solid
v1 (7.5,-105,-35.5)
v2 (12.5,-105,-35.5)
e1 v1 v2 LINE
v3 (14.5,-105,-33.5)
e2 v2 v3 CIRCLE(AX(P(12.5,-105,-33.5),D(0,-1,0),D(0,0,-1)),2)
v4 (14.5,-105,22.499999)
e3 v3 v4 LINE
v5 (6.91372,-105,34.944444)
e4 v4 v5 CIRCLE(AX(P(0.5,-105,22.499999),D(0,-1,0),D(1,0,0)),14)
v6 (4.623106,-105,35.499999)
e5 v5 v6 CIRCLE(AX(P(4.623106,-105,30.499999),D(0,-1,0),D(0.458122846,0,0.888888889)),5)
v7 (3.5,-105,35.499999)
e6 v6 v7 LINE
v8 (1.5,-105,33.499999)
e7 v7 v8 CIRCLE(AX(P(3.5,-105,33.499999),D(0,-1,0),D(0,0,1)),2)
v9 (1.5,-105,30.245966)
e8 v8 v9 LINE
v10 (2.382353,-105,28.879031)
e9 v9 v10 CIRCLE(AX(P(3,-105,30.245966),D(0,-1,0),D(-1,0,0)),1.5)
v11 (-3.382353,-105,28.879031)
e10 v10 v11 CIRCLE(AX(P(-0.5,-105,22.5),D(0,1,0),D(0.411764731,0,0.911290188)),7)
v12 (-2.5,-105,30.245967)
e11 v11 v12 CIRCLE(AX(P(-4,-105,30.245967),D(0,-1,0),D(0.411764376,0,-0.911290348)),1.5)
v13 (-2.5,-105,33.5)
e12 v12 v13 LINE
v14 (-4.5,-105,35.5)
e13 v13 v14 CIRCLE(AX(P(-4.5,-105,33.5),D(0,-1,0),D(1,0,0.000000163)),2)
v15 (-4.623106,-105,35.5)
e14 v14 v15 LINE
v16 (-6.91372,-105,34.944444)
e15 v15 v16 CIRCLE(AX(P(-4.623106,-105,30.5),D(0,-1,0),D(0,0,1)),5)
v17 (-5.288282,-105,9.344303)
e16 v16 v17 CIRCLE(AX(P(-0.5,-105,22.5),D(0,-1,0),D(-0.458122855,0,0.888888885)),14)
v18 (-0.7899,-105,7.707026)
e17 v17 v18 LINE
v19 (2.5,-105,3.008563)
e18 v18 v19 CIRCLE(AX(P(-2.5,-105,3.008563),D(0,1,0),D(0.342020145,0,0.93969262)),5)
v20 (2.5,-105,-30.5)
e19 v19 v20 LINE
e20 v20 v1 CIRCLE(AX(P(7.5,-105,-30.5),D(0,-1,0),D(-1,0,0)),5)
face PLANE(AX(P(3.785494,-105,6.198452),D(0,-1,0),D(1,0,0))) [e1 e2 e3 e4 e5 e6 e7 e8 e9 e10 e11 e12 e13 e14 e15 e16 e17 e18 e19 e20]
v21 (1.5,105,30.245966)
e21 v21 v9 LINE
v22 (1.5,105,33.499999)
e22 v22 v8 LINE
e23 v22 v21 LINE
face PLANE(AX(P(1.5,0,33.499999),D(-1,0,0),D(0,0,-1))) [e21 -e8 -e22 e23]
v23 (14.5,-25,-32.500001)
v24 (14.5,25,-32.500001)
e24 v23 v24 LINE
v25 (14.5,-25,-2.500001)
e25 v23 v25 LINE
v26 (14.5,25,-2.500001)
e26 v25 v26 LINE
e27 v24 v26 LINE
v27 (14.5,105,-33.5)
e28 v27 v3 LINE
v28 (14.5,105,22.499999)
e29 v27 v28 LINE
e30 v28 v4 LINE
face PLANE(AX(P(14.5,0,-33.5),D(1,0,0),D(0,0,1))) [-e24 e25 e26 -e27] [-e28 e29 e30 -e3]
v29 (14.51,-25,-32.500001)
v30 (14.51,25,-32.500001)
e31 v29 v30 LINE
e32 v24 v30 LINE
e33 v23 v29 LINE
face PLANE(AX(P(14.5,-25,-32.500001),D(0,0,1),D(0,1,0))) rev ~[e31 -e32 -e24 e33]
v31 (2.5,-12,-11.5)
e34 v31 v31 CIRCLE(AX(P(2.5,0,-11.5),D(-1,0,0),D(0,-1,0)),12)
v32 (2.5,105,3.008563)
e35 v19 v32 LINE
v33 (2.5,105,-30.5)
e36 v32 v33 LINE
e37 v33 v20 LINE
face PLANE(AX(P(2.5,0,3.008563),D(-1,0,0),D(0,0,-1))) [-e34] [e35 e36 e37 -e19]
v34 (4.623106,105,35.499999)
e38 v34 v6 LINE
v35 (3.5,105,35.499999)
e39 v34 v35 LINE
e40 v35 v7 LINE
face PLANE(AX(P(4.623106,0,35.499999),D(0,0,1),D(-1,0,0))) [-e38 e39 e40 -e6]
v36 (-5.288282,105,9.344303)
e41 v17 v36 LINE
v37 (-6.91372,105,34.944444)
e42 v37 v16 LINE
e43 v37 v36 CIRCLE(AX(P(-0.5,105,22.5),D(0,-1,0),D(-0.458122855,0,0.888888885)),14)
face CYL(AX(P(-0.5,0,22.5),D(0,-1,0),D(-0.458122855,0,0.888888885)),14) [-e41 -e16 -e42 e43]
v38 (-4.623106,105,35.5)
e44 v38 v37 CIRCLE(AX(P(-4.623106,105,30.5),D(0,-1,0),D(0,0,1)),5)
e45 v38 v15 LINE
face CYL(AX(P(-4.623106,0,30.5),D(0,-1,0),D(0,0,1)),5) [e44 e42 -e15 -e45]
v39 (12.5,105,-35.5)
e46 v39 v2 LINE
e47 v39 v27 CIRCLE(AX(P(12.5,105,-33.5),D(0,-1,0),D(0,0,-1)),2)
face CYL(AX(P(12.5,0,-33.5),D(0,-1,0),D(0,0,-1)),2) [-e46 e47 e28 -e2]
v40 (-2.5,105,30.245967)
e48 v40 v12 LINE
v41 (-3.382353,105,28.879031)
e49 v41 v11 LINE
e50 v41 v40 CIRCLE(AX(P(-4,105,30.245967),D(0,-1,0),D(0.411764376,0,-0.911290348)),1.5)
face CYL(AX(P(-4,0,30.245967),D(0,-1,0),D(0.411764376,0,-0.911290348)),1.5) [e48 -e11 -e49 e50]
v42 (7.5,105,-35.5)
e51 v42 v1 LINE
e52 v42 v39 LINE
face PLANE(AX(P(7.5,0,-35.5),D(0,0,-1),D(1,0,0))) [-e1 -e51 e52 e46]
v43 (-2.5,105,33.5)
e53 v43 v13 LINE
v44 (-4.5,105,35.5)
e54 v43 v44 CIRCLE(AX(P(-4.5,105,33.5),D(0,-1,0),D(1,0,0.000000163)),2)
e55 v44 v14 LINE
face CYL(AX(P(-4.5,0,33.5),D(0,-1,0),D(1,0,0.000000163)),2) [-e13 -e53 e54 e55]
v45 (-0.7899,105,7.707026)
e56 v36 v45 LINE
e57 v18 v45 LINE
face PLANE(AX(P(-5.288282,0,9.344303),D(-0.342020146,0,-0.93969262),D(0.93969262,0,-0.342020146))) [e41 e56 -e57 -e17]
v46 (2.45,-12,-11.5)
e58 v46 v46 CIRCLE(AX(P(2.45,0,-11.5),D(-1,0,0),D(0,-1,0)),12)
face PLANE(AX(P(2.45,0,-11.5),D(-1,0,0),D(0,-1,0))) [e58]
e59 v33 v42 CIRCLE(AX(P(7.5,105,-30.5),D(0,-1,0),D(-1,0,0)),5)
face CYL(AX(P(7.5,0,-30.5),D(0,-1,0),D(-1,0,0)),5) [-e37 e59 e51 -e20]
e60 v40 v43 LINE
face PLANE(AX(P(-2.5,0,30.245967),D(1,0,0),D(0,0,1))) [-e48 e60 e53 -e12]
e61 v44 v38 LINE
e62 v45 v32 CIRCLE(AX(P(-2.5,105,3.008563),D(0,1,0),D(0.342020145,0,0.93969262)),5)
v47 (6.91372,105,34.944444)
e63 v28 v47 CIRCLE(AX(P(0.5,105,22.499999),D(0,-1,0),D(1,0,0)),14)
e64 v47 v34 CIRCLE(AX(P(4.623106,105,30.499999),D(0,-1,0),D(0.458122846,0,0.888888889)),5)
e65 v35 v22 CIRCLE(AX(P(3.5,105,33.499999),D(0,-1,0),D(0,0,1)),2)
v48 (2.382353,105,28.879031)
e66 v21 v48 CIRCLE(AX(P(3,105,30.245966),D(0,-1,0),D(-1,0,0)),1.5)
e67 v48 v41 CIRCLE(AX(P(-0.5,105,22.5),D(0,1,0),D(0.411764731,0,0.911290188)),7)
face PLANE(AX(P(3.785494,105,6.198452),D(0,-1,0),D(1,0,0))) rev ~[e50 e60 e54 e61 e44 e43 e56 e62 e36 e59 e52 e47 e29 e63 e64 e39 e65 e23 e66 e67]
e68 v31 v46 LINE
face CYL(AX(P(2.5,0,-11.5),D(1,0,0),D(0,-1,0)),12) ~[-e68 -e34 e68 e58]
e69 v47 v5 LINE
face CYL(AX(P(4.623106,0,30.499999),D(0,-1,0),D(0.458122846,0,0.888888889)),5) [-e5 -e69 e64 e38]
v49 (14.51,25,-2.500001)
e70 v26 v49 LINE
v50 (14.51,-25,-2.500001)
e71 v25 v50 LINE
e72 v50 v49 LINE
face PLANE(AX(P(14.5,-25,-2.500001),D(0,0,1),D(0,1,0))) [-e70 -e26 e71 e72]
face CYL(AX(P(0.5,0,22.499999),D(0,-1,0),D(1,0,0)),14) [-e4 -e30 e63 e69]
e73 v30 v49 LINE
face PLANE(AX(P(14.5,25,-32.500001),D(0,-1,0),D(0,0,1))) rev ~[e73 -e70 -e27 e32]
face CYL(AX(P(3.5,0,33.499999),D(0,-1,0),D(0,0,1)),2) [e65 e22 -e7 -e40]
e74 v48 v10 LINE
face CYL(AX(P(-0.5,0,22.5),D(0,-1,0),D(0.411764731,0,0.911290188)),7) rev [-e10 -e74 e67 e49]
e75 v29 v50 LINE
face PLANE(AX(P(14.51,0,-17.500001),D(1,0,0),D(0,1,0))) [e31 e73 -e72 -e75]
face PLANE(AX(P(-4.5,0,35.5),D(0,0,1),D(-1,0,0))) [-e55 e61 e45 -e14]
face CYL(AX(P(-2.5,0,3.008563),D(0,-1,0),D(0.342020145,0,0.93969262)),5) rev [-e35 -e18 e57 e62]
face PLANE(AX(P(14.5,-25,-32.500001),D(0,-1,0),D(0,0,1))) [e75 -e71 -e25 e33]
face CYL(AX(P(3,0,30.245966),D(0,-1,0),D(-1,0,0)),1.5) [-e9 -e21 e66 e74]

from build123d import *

# Parameters (mm, degrees)
F1_DEPTH = 105
F2_R     = 12
F3_DEPTH = 0.05
F4_W     = 50
F4_H     = 30
F5_DEPTH = 0.01


# Not quite as in the source:
# - ends of sketch curves that miss each other by under 0.0002 mm in the source are joined


with BuildPart() as f1:
    # F0 (on Front) → F1 (new body, symmetric)
    with BuildSketch(Plane.XZ):
        with BuildLine():
            Line((2.4999997663, 3.0085625581), (2.4999997663, -30.5))
            ThreePointArc((2.4999997663, -30.5), (3.9644658603, -34.0355339059), (7.4999997663, -35.5))
            Line((7.4999997663, -35.5), (12.4999997663, -35.5))
            ThreePointArc((12.4999997663, -35.5), (13.9142133287, -34.9142135624), (14.4999997663, -33.5))
            Line((14.4999997663, -33.5), (14.4999997663, 22.4999994828))
            ThreePointArc((14.4999997663, 22.4999994828), (12.4539129776, 29.7872458033), (6.9137199183, 34.9444437777))
            ThreePointArc((6.9137199183, 34.9444437777), (5.8016169865, 35.3591259101), (4.6231056877, 35.4999993303))
            Line((4.6231056877, 35.4999993303), (3.4999997663, 35.4999993303))
            ThreePointArc((3.4999997663, 35.4999993303), (2.0857862039, 34.9142128927), (1.4999997663, 33.4999993303))
            Line((1.4999997663, 33.4999993303), (1.4999997663, 30.2459664828))
            ThreePointArc((1.4999997663, 30.2459664828), (1.7397477835, 29.4324771221), (2.3823530195, 28.8790310431))
            ThreePointArc((2.3823530195, 28.8790310431), (-0.5000000985, 15.4999997293), (-3.3823532363, 28.8790310342))
            ThreePointArc((-3.3823532363, 28.8790310342), (-2.7397478169, 29.4324771961), (-2.4999997997, 30.2459665567))
            Line((-2.4999997997, 30.2459665567), (-2.4999997997, 33.5))
            ThreePointArc((-2.4999997997, 33.5), (-3.0857862373, 34.9142132361), (-4.4999997997, 35.4999996738))
            Line((-4.4999997997, 35.4999996738), (-4.6231058319, 35.4999996738))
            ThreePointArc((-4.6231058319, 35.4999996738), (-5.8016171306, 35.3591262536), (-6.9137200625, 34.9444441212))
            ThreePointArc((-6.9137200625, 34.9444441212), (-14.4718653147, 21.6128794539), (-5.288282, 9.344303))
            Line((-5.288282, 9.344303), (-0.7898995061, 7.707025658))
            ThreePointArc((-0.7898995061, 7.707025658), (1.5957599911, 5.8764447351), (2.4999997663, 3.0085625581))
        make_face()
    extrude(amount=F1_DEPTH, both=True)

    # F2 (on face) → F3 (join)
    with BuildSketch(Plane(origin=(2.4999997663, 0, 0), x_dir=(0, -1, 0), z_dir=(-1, 0, 0))):
        with Locations((0, -11.5)):
            Circle(F2_R)
    extrude(amount=F3_DEPTH)

    # F4 (on face) → F5 (join)
    with BuildSketch(Plane.YZ.offset(14.4999997663)):
        with Locations((0, -17.5000005172)):
            Rectangle(F4_W, F4_H)
    extrude(amount=F5_DEPTH)


solid = f1.part
